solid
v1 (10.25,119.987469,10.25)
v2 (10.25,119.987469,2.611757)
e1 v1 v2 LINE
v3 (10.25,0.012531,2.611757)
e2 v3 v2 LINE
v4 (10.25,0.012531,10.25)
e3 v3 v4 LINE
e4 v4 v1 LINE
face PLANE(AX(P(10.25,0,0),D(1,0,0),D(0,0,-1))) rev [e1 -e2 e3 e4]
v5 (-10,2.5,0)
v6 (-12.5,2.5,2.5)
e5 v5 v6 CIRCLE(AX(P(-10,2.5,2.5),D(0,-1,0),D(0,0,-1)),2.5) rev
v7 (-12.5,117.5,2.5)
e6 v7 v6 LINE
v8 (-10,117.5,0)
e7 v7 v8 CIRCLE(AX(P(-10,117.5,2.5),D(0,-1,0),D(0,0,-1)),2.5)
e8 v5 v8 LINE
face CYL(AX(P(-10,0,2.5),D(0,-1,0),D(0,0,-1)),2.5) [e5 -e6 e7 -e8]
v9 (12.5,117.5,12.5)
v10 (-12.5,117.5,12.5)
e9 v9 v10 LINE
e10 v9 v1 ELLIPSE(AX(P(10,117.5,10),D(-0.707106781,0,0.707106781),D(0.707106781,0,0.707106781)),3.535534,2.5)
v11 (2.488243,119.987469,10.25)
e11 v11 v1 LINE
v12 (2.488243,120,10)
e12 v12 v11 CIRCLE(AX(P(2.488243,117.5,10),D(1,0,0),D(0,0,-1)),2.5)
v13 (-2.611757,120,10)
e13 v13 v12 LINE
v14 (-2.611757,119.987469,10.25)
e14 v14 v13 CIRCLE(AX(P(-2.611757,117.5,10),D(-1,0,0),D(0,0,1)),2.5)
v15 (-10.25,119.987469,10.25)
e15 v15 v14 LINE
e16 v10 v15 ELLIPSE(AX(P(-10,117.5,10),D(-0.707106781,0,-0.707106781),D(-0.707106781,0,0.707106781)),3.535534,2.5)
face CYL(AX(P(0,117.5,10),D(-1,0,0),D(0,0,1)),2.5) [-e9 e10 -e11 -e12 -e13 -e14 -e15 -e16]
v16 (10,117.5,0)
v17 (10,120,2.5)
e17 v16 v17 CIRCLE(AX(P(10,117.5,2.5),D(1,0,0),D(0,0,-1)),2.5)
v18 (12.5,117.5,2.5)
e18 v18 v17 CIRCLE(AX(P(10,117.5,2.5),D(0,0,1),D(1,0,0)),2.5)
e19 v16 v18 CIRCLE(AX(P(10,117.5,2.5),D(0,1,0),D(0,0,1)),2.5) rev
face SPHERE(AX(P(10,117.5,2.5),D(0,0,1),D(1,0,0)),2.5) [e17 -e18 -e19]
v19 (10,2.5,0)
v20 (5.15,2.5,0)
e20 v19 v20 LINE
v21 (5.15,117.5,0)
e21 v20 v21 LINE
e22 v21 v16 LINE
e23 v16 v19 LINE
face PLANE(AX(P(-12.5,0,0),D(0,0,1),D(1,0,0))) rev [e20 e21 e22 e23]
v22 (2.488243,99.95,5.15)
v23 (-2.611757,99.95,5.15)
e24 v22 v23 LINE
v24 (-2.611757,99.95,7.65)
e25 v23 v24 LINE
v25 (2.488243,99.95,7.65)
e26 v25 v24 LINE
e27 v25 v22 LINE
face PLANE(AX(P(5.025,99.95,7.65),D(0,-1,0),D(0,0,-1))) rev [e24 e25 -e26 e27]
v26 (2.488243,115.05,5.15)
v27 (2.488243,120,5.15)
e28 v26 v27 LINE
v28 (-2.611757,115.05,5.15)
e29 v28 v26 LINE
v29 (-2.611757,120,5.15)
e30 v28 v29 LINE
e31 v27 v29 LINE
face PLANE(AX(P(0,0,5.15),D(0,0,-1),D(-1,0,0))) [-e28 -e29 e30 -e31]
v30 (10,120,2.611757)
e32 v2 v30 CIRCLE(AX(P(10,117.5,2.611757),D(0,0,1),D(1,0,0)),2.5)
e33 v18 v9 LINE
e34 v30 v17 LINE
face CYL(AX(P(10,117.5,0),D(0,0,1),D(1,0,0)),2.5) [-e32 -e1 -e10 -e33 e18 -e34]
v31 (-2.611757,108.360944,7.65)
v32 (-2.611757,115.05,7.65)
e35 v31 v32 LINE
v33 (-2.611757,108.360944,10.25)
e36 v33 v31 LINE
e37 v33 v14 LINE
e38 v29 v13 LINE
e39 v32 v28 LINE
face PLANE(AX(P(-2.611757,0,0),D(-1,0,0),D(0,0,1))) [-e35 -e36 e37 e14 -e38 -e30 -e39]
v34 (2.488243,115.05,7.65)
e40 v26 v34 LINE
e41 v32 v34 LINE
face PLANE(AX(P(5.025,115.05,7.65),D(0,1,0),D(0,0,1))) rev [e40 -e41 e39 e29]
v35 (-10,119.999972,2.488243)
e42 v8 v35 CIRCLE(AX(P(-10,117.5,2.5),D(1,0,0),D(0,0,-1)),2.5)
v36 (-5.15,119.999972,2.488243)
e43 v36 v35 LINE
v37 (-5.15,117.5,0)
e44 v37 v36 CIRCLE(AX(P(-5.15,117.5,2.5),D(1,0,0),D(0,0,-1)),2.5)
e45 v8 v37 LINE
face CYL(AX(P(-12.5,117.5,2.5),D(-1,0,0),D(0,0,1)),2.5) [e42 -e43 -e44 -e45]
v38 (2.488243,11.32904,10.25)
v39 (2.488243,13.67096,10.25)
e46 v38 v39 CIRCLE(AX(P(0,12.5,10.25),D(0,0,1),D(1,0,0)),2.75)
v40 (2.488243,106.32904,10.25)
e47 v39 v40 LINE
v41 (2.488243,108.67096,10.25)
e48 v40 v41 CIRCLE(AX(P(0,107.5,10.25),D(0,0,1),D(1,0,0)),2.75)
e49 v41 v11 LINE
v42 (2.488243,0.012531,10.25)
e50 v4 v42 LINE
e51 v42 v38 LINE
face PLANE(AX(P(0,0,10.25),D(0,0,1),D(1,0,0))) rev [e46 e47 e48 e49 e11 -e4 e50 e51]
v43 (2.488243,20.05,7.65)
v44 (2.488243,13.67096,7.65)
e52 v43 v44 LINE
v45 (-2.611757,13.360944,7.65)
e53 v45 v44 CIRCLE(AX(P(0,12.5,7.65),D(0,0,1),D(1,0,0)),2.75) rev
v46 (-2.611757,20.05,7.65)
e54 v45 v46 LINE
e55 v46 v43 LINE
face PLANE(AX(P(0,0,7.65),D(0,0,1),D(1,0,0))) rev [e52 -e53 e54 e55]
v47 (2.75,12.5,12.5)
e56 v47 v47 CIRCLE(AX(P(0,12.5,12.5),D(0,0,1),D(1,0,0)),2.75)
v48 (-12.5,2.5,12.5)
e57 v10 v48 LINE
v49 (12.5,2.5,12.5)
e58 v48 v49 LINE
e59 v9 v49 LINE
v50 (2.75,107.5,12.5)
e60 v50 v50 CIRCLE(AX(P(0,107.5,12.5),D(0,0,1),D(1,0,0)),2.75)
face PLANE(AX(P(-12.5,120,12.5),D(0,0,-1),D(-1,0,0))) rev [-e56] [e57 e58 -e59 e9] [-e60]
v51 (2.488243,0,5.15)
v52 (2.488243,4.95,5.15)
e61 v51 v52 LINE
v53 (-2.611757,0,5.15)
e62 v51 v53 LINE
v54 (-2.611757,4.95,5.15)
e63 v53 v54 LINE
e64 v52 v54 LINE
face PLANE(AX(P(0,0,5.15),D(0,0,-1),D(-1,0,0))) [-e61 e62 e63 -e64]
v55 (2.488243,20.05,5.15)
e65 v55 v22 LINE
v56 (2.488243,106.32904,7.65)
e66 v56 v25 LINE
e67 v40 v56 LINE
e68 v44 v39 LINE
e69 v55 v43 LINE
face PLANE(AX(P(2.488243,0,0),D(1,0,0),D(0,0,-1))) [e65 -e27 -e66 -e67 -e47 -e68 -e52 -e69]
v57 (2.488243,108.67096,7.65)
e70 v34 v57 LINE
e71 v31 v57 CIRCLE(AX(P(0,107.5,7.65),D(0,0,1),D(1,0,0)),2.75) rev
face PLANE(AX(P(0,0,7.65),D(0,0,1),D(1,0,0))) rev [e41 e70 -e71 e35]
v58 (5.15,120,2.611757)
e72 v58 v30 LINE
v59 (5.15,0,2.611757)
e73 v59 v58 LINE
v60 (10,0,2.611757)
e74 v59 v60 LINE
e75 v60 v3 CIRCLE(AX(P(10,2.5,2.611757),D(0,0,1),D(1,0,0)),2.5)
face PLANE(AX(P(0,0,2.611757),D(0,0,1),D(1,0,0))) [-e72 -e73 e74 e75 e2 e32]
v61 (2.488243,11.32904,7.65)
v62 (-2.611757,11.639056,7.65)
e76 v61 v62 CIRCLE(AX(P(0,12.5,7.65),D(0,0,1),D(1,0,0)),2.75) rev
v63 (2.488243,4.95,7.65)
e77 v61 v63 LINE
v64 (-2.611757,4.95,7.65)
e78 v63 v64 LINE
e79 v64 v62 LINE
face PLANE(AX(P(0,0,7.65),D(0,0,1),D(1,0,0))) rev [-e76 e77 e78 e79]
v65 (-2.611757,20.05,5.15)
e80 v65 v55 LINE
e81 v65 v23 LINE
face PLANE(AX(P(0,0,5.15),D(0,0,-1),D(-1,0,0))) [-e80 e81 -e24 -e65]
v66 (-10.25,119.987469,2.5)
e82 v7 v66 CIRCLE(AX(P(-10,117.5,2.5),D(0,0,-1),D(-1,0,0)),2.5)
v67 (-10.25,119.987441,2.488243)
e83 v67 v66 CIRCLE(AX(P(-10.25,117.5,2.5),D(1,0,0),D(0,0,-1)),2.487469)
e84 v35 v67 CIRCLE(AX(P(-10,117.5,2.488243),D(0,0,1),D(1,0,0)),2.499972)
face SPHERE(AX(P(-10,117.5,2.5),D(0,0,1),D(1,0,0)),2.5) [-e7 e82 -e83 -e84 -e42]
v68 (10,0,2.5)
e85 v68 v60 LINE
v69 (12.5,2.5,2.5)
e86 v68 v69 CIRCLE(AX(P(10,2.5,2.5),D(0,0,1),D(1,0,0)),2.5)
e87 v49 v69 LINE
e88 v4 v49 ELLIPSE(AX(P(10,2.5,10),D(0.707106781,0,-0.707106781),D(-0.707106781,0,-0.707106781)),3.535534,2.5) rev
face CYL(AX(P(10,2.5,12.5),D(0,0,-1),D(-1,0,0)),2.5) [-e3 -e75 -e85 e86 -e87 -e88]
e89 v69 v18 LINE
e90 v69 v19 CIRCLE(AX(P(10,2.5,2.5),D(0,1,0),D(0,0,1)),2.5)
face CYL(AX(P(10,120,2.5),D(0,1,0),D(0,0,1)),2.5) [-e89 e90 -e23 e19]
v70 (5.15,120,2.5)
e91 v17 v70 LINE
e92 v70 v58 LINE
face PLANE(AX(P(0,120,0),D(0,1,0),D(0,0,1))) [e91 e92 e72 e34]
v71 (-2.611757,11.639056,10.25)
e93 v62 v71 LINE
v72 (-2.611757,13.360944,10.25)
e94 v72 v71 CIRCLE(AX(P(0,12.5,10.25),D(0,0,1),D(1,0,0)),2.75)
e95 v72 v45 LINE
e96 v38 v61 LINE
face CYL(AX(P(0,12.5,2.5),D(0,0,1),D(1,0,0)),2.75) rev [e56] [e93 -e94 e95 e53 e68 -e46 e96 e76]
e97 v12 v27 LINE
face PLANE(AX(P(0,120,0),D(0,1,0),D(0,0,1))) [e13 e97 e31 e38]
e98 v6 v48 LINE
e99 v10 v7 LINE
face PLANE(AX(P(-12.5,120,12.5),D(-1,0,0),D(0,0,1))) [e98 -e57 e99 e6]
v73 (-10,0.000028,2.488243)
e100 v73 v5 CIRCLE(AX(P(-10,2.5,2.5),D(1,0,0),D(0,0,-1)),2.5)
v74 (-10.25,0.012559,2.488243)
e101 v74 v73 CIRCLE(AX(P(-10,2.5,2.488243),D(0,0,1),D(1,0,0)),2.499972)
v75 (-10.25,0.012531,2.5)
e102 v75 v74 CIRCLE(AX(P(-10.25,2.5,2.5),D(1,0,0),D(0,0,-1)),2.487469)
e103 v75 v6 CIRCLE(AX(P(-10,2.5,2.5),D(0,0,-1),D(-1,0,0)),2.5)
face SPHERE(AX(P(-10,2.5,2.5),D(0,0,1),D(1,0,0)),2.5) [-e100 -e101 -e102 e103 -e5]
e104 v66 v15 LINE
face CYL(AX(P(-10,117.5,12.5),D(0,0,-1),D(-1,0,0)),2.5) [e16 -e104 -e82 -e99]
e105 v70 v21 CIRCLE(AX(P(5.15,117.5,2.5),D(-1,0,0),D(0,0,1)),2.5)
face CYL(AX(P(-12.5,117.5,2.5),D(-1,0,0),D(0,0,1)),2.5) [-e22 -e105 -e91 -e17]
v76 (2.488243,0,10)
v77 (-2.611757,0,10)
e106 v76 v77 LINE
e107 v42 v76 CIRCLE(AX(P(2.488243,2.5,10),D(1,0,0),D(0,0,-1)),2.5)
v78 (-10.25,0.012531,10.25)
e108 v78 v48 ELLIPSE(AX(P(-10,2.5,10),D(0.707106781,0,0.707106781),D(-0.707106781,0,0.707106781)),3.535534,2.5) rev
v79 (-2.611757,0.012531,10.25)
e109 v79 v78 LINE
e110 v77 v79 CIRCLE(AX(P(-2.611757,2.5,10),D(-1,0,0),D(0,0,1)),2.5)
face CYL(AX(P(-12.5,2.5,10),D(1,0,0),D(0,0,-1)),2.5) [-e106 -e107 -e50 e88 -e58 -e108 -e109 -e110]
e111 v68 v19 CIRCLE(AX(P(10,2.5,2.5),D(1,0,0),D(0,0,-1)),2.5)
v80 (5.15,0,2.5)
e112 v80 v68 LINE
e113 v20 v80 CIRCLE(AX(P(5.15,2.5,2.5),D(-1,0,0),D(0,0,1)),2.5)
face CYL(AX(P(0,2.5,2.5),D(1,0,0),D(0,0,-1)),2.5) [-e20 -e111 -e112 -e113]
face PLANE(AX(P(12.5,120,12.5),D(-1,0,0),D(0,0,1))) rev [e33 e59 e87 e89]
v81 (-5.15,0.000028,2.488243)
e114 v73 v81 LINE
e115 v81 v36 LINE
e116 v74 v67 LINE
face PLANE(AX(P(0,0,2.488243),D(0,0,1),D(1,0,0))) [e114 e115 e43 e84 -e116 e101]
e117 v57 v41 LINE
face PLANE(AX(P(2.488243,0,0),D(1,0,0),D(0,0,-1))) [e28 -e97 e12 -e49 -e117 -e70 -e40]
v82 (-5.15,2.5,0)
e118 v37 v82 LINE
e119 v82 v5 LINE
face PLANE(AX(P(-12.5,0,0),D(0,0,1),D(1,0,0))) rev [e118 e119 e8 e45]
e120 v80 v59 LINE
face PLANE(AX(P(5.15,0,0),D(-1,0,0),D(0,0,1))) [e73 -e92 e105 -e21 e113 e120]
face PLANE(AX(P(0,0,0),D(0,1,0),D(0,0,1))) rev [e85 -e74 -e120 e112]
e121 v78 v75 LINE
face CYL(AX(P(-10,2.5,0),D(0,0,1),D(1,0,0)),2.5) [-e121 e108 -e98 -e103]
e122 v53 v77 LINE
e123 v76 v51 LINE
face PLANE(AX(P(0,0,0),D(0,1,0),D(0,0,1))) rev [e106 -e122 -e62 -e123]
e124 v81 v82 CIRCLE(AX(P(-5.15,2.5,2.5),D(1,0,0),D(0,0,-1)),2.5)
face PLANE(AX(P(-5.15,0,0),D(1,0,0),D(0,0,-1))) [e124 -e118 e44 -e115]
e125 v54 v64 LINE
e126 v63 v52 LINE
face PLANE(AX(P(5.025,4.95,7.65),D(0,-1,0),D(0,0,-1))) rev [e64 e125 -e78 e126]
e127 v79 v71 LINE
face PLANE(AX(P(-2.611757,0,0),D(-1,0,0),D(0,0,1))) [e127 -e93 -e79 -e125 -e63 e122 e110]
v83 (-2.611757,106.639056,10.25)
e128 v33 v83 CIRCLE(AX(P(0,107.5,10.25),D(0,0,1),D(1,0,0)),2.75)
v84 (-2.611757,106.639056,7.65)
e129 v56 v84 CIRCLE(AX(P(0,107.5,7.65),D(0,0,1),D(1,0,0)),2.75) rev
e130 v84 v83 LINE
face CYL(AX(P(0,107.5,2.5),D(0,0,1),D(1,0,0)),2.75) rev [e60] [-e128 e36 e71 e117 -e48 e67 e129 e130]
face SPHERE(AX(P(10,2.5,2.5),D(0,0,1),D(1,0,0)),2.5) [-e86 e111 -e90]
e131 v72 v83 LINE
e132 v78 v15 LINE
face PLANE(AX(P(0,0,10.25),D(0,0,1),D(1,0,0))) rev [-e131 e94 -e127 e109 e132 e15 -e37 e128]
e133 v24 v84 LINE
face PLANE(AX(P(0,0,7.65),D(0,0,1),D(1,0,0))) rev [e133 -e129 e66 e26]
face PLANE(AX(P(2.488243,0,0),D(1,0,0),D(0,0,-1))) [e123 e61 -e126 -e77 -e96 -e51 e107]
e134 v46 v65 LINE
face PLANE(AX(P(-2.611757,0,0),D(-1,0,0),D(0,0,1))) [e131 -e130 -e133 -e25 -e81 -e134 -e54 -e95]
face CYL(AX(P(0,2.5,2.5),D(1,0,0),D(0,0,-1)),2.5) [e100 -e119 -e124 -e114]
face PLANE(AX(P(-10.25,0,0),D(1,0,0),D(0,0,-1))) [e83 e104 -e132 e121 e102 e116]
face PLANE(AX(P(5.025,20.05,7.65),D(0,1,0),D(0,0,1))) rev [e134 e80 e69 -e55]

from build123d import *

# Parameters (mm, degrees)
SKETCH1_W           = 25
SKETCH1_H           = 25
BOSS_EXTRUDE1_DEPTH = 120
CUT_EXTRUDE1_DEPTH  = 120
SKETCH3_W           = 25
SKETCH3_H           = 12.5
CUT_EXTRUDE2_DEPTH  = 120
FILLET1_R           = 2.5
FILLET2_R           = 2.5
FILLET3_R           = 2.5
SKETCH6_R           = 2.75
CUT_EXTRUDE3_DEPTH  = 10
SKETCH7_W           = 10.05
SKETCH7_H           = 15.1
CUT_EXTRUDE4_DEPTH  = 2.5


with BuildPart() as part:
    # Sketch1 → Boss-Extrude1 (new body)
    with BuildSketch(Plane(origin=(0, 0, 0), x_dir=(1, 0, 0), z_dir=(0, 1, 0))):
        Rectangle(SKETCH1_W, SKETCH1_H)
    extrude(amount=BOSS_EXTRUDE1_DEPTH)

    # Sketch2 → Cut-Extrude1 (cut)
    with BuildSketch(Plane(origin=(0, 120, 0), x_dir=(1, 0, 0), z_dir=(0, 1, 0))):
        Polygon((-10.25, -2.48824277), (-10.25, -10.25), (-2.61175723, -10.25), (-2.61175723, -5.15), (2.48824277, -5.15), (2.48824277, -10.25), (10.25, -10.25), (10.25, -2.61175723), (5.15, -2.61175723), (5.15, 2.48824277), (10.25, 2.48824277), (10.25, 10.25), (2.61175723, 10.25), (2.61175723, 5.15), (-2.48824277, 5.15), (-2.48824277, 10.25), (-10.25, 10.25), (-10.25, 2.61175723), (-5.15, 2.61175723), (-5.15, -2.48824277), align=None)
    extrude(amount=-CUT_EXTRUDE1_DEPTH, mode=Mode.SUBTRACT)

    # Sketch3 → Cut-Extrude2 (cut)
    with BuildSketch(Plane(origin=(0, 120, 0), x_dir=(1, 0, 0), z_dir=(0, 1, 0))):
        with Locations((0, 6.25)):
            Rectangle(SKETCH3_W, SKETCH3_H)
    extrude(amount=-CUT_EXTRUDE2_DEPTH, mode=Mode.SUBTRACT)

    # Fillet1
    fillet1_edges = [part.edges().sort_by_distance(p)[0] for p in [
        (-12.5, 60, 0),
    ]]
    fillet(fillet1_edges, radius=FILLET1_R)

    # Fillet2
    fillet2_edges = [part.edges().sort_by_distance(p)[0] for p in [
        (12.5, 60, 0),
    ]]
    fillet(fillet2_edges, radius=FILLET2_R)

    # Fillet3
    # the kernel refuses this fillet: 2.5 mm, written as the material it takes off along each edge
    with BuildSketch(Plane(origin=(-10, 0, 0), x_dir=(0, 0, 1), z_dir=(1, 0, 0)), Plane(origin=(-1.1, 0, 0), x_dir=(0, 0, 1), z_dir=(1, 0, 0)), Plane(origin=(-10, 120, 0), x_dir=(0, -1, 0), z_dir=(1, 0, 0)), Plane(origin=(-1.1, 120, 0), x_dir=(0, -1, 0), z_dir=(1, 0, 0))) as fillet3_piece_1:
        with BuildLine():
            CenterArc((FILLET3_R, -FILLET3_R), FILLET3_R, 90, 90)
            Line((0, -FILLET3_R), (0, 0))
            Line((0, 0), (FILLET3_R, 0))
        make_face()
    extrude(amount=11.1, mode=Mode.SUBTRACT)
    with BuildSketch(Plane(origin=(-10, 0, 2.5), x_dir=(-1, 0, 0), z_dir=(0, 0, 1))) as fillet3_piece_2:
        with BuildLine():
            CenterArc((2.5 - FILLET3_R, -FILLET3_R), FILLET3_R, 0, 90)
            Line((2.5, -FILLET3_R), (2.5, 0))
            Line((2.5, 0), (2.5 - FILLET3_R, 0))
        make_face()
    revolve(axis=Axis((-10, 0, 2.5), (0, -1, 0)), revolution_arc=90, mode=Mode.SUBTRACT)
    with BuildSketch(Plane(origin=(10, 0, 2.5), x_dir=(1, 0, 0), z_dir=(0, 0, 1))) as fillet3_piece_3:
        with BuildLine():
            CenterArc((2.5 - FILLET3_R, FILLET3_R), FILLET3_R, 270, 90)
            Line((2.5, FILLET3_R), (2.5, 0))
            Line((2.5, 0), (2.5 - FILLET3_R, 0))
        make_face()
    revolve(axis=Axis((10, 0, 2.5), (0, 1, 0)), revolution_arc=90, mode=Mode.SUBTRACT)
    with BuildSketch(Plane(origin=(-10, 120, 2.5), x_dir=(-1, 0, 0), z_dir=(0, 0, 1))) as fillet3_piece_4:
        with BuildLine():
            CenterArc((2.5 - FILLET3_R, FILLET3_R), FILLET3_R, 270, 90)
            Line((2.5 - FILLET3_R, 0), (2.5, 0))
            Line((2.5, 0), (2.5, FILLET3_R))
        make_face()
    revolve(axis=Axis((-10, 120, 2.5), (0, -1, 0)), revolution_arc=90, mode=Mode.SUBTRACT)
    with BuildSketch(Plane(origin=(10, 120, 2.5), x_dir=(1, 0, 0), z_dir=(0, 0, 1))) as fillet3_piece_5:
        with BuildLine():
            CenterArc((2.5 - FILLET3_R, -FILLET3_R), FILLET3_R, 0, 90)
            Line((2.5 - FILLET3_R, 0), (2.5, 0))
            Line((2.5, 0), (2.5, -FILLET3_R))
        make_face()
    revolve(axis=Axis((10, 120, 2.5), (0, 1, 0)), revolution_arc=90, mode=Mode.SUBTRACT)
    with BuildSketch(Plane(origin=(-18.75, 0, 12.5), x_dir=(0, 0, -1), z_dir=(1, 0, 0)), Plane(origin=(-18.75, 120, 12.5), x_dir=(0, -1, 0), z_dir=(1, 0, 0))) as fillet3_piece_6:
        with BuildLine():
            CenterArc((FILLET3_R, FILLET3_R), FILLET3_R, 180, 90)
            Line((0, FILLET3_R), (0, 0))
            Line((0, 0), (FILLET3_R, 0))
        make_face()
    extrude(amount=37.5, mode=Mode.SUBTRACT)
    with BuildSketch(Plane(origin=(-12.5, 0, 2.5), x_dir=(1, 0, 0), z_dir=(0, 0, 1)), Plane(origin=(12.5, 0, 18.75), x_dir=(-1, 0, 0), z_dir=(0, 0, -1)), Plane(origin=(-12.5, 120, 2.5), x_dir=(0, -1, 0), z_dir=(0, 0, 1)), Plane(origin=(12.5, 120, 18.75), x_dir=(0, -1, 0), z_dir=(0, 0, -1))) as fillet3_piece_7:
        with BuildLine():
            CenterArc((FILLET3_R, FILLET3_R), FILLET3_R, 180, 90)
            Line((0, FILLET3_R), (0, 0))
            Line((0, 0), (FILLET3_R, 0))
        make_face()
    extrude(amount=16.25, mode=Mode.SUBTRACT)

    # Sketch6 → Cut-Extrude3 (cut)
    with BuildSketch(Plane.XY.offset(12.5)):
        with Locations((0, 107.5)):
            Circle(SKETCH6_R)
        with Locations((0, 12.5)):
            Circle(SKETCH6_R)
    extrude(amount=-CUT_EXTRUDE3_DEPTH, mode=Mode.SUBTRACT)

    # Sketch7 → Cut-Extrude4 (cut)
    with BuildSketch(Plane(origin=(0, 0, 5.15), x_dir=(-1, 0, 0), z_dir=(0, 0, -1))):
        with Locations((0, 107.5)):
            Rectangle(SKETCH7_W, SKETCH7_H)
        with Locations((0, 12.5)):
            Rectangle(SKETCH7_W, SKETCH7_H)
    extrude(amount=-CUT_EXTRUDE4_DEPTH, mode=Mode.SUBTRACT)


solid = part.part
